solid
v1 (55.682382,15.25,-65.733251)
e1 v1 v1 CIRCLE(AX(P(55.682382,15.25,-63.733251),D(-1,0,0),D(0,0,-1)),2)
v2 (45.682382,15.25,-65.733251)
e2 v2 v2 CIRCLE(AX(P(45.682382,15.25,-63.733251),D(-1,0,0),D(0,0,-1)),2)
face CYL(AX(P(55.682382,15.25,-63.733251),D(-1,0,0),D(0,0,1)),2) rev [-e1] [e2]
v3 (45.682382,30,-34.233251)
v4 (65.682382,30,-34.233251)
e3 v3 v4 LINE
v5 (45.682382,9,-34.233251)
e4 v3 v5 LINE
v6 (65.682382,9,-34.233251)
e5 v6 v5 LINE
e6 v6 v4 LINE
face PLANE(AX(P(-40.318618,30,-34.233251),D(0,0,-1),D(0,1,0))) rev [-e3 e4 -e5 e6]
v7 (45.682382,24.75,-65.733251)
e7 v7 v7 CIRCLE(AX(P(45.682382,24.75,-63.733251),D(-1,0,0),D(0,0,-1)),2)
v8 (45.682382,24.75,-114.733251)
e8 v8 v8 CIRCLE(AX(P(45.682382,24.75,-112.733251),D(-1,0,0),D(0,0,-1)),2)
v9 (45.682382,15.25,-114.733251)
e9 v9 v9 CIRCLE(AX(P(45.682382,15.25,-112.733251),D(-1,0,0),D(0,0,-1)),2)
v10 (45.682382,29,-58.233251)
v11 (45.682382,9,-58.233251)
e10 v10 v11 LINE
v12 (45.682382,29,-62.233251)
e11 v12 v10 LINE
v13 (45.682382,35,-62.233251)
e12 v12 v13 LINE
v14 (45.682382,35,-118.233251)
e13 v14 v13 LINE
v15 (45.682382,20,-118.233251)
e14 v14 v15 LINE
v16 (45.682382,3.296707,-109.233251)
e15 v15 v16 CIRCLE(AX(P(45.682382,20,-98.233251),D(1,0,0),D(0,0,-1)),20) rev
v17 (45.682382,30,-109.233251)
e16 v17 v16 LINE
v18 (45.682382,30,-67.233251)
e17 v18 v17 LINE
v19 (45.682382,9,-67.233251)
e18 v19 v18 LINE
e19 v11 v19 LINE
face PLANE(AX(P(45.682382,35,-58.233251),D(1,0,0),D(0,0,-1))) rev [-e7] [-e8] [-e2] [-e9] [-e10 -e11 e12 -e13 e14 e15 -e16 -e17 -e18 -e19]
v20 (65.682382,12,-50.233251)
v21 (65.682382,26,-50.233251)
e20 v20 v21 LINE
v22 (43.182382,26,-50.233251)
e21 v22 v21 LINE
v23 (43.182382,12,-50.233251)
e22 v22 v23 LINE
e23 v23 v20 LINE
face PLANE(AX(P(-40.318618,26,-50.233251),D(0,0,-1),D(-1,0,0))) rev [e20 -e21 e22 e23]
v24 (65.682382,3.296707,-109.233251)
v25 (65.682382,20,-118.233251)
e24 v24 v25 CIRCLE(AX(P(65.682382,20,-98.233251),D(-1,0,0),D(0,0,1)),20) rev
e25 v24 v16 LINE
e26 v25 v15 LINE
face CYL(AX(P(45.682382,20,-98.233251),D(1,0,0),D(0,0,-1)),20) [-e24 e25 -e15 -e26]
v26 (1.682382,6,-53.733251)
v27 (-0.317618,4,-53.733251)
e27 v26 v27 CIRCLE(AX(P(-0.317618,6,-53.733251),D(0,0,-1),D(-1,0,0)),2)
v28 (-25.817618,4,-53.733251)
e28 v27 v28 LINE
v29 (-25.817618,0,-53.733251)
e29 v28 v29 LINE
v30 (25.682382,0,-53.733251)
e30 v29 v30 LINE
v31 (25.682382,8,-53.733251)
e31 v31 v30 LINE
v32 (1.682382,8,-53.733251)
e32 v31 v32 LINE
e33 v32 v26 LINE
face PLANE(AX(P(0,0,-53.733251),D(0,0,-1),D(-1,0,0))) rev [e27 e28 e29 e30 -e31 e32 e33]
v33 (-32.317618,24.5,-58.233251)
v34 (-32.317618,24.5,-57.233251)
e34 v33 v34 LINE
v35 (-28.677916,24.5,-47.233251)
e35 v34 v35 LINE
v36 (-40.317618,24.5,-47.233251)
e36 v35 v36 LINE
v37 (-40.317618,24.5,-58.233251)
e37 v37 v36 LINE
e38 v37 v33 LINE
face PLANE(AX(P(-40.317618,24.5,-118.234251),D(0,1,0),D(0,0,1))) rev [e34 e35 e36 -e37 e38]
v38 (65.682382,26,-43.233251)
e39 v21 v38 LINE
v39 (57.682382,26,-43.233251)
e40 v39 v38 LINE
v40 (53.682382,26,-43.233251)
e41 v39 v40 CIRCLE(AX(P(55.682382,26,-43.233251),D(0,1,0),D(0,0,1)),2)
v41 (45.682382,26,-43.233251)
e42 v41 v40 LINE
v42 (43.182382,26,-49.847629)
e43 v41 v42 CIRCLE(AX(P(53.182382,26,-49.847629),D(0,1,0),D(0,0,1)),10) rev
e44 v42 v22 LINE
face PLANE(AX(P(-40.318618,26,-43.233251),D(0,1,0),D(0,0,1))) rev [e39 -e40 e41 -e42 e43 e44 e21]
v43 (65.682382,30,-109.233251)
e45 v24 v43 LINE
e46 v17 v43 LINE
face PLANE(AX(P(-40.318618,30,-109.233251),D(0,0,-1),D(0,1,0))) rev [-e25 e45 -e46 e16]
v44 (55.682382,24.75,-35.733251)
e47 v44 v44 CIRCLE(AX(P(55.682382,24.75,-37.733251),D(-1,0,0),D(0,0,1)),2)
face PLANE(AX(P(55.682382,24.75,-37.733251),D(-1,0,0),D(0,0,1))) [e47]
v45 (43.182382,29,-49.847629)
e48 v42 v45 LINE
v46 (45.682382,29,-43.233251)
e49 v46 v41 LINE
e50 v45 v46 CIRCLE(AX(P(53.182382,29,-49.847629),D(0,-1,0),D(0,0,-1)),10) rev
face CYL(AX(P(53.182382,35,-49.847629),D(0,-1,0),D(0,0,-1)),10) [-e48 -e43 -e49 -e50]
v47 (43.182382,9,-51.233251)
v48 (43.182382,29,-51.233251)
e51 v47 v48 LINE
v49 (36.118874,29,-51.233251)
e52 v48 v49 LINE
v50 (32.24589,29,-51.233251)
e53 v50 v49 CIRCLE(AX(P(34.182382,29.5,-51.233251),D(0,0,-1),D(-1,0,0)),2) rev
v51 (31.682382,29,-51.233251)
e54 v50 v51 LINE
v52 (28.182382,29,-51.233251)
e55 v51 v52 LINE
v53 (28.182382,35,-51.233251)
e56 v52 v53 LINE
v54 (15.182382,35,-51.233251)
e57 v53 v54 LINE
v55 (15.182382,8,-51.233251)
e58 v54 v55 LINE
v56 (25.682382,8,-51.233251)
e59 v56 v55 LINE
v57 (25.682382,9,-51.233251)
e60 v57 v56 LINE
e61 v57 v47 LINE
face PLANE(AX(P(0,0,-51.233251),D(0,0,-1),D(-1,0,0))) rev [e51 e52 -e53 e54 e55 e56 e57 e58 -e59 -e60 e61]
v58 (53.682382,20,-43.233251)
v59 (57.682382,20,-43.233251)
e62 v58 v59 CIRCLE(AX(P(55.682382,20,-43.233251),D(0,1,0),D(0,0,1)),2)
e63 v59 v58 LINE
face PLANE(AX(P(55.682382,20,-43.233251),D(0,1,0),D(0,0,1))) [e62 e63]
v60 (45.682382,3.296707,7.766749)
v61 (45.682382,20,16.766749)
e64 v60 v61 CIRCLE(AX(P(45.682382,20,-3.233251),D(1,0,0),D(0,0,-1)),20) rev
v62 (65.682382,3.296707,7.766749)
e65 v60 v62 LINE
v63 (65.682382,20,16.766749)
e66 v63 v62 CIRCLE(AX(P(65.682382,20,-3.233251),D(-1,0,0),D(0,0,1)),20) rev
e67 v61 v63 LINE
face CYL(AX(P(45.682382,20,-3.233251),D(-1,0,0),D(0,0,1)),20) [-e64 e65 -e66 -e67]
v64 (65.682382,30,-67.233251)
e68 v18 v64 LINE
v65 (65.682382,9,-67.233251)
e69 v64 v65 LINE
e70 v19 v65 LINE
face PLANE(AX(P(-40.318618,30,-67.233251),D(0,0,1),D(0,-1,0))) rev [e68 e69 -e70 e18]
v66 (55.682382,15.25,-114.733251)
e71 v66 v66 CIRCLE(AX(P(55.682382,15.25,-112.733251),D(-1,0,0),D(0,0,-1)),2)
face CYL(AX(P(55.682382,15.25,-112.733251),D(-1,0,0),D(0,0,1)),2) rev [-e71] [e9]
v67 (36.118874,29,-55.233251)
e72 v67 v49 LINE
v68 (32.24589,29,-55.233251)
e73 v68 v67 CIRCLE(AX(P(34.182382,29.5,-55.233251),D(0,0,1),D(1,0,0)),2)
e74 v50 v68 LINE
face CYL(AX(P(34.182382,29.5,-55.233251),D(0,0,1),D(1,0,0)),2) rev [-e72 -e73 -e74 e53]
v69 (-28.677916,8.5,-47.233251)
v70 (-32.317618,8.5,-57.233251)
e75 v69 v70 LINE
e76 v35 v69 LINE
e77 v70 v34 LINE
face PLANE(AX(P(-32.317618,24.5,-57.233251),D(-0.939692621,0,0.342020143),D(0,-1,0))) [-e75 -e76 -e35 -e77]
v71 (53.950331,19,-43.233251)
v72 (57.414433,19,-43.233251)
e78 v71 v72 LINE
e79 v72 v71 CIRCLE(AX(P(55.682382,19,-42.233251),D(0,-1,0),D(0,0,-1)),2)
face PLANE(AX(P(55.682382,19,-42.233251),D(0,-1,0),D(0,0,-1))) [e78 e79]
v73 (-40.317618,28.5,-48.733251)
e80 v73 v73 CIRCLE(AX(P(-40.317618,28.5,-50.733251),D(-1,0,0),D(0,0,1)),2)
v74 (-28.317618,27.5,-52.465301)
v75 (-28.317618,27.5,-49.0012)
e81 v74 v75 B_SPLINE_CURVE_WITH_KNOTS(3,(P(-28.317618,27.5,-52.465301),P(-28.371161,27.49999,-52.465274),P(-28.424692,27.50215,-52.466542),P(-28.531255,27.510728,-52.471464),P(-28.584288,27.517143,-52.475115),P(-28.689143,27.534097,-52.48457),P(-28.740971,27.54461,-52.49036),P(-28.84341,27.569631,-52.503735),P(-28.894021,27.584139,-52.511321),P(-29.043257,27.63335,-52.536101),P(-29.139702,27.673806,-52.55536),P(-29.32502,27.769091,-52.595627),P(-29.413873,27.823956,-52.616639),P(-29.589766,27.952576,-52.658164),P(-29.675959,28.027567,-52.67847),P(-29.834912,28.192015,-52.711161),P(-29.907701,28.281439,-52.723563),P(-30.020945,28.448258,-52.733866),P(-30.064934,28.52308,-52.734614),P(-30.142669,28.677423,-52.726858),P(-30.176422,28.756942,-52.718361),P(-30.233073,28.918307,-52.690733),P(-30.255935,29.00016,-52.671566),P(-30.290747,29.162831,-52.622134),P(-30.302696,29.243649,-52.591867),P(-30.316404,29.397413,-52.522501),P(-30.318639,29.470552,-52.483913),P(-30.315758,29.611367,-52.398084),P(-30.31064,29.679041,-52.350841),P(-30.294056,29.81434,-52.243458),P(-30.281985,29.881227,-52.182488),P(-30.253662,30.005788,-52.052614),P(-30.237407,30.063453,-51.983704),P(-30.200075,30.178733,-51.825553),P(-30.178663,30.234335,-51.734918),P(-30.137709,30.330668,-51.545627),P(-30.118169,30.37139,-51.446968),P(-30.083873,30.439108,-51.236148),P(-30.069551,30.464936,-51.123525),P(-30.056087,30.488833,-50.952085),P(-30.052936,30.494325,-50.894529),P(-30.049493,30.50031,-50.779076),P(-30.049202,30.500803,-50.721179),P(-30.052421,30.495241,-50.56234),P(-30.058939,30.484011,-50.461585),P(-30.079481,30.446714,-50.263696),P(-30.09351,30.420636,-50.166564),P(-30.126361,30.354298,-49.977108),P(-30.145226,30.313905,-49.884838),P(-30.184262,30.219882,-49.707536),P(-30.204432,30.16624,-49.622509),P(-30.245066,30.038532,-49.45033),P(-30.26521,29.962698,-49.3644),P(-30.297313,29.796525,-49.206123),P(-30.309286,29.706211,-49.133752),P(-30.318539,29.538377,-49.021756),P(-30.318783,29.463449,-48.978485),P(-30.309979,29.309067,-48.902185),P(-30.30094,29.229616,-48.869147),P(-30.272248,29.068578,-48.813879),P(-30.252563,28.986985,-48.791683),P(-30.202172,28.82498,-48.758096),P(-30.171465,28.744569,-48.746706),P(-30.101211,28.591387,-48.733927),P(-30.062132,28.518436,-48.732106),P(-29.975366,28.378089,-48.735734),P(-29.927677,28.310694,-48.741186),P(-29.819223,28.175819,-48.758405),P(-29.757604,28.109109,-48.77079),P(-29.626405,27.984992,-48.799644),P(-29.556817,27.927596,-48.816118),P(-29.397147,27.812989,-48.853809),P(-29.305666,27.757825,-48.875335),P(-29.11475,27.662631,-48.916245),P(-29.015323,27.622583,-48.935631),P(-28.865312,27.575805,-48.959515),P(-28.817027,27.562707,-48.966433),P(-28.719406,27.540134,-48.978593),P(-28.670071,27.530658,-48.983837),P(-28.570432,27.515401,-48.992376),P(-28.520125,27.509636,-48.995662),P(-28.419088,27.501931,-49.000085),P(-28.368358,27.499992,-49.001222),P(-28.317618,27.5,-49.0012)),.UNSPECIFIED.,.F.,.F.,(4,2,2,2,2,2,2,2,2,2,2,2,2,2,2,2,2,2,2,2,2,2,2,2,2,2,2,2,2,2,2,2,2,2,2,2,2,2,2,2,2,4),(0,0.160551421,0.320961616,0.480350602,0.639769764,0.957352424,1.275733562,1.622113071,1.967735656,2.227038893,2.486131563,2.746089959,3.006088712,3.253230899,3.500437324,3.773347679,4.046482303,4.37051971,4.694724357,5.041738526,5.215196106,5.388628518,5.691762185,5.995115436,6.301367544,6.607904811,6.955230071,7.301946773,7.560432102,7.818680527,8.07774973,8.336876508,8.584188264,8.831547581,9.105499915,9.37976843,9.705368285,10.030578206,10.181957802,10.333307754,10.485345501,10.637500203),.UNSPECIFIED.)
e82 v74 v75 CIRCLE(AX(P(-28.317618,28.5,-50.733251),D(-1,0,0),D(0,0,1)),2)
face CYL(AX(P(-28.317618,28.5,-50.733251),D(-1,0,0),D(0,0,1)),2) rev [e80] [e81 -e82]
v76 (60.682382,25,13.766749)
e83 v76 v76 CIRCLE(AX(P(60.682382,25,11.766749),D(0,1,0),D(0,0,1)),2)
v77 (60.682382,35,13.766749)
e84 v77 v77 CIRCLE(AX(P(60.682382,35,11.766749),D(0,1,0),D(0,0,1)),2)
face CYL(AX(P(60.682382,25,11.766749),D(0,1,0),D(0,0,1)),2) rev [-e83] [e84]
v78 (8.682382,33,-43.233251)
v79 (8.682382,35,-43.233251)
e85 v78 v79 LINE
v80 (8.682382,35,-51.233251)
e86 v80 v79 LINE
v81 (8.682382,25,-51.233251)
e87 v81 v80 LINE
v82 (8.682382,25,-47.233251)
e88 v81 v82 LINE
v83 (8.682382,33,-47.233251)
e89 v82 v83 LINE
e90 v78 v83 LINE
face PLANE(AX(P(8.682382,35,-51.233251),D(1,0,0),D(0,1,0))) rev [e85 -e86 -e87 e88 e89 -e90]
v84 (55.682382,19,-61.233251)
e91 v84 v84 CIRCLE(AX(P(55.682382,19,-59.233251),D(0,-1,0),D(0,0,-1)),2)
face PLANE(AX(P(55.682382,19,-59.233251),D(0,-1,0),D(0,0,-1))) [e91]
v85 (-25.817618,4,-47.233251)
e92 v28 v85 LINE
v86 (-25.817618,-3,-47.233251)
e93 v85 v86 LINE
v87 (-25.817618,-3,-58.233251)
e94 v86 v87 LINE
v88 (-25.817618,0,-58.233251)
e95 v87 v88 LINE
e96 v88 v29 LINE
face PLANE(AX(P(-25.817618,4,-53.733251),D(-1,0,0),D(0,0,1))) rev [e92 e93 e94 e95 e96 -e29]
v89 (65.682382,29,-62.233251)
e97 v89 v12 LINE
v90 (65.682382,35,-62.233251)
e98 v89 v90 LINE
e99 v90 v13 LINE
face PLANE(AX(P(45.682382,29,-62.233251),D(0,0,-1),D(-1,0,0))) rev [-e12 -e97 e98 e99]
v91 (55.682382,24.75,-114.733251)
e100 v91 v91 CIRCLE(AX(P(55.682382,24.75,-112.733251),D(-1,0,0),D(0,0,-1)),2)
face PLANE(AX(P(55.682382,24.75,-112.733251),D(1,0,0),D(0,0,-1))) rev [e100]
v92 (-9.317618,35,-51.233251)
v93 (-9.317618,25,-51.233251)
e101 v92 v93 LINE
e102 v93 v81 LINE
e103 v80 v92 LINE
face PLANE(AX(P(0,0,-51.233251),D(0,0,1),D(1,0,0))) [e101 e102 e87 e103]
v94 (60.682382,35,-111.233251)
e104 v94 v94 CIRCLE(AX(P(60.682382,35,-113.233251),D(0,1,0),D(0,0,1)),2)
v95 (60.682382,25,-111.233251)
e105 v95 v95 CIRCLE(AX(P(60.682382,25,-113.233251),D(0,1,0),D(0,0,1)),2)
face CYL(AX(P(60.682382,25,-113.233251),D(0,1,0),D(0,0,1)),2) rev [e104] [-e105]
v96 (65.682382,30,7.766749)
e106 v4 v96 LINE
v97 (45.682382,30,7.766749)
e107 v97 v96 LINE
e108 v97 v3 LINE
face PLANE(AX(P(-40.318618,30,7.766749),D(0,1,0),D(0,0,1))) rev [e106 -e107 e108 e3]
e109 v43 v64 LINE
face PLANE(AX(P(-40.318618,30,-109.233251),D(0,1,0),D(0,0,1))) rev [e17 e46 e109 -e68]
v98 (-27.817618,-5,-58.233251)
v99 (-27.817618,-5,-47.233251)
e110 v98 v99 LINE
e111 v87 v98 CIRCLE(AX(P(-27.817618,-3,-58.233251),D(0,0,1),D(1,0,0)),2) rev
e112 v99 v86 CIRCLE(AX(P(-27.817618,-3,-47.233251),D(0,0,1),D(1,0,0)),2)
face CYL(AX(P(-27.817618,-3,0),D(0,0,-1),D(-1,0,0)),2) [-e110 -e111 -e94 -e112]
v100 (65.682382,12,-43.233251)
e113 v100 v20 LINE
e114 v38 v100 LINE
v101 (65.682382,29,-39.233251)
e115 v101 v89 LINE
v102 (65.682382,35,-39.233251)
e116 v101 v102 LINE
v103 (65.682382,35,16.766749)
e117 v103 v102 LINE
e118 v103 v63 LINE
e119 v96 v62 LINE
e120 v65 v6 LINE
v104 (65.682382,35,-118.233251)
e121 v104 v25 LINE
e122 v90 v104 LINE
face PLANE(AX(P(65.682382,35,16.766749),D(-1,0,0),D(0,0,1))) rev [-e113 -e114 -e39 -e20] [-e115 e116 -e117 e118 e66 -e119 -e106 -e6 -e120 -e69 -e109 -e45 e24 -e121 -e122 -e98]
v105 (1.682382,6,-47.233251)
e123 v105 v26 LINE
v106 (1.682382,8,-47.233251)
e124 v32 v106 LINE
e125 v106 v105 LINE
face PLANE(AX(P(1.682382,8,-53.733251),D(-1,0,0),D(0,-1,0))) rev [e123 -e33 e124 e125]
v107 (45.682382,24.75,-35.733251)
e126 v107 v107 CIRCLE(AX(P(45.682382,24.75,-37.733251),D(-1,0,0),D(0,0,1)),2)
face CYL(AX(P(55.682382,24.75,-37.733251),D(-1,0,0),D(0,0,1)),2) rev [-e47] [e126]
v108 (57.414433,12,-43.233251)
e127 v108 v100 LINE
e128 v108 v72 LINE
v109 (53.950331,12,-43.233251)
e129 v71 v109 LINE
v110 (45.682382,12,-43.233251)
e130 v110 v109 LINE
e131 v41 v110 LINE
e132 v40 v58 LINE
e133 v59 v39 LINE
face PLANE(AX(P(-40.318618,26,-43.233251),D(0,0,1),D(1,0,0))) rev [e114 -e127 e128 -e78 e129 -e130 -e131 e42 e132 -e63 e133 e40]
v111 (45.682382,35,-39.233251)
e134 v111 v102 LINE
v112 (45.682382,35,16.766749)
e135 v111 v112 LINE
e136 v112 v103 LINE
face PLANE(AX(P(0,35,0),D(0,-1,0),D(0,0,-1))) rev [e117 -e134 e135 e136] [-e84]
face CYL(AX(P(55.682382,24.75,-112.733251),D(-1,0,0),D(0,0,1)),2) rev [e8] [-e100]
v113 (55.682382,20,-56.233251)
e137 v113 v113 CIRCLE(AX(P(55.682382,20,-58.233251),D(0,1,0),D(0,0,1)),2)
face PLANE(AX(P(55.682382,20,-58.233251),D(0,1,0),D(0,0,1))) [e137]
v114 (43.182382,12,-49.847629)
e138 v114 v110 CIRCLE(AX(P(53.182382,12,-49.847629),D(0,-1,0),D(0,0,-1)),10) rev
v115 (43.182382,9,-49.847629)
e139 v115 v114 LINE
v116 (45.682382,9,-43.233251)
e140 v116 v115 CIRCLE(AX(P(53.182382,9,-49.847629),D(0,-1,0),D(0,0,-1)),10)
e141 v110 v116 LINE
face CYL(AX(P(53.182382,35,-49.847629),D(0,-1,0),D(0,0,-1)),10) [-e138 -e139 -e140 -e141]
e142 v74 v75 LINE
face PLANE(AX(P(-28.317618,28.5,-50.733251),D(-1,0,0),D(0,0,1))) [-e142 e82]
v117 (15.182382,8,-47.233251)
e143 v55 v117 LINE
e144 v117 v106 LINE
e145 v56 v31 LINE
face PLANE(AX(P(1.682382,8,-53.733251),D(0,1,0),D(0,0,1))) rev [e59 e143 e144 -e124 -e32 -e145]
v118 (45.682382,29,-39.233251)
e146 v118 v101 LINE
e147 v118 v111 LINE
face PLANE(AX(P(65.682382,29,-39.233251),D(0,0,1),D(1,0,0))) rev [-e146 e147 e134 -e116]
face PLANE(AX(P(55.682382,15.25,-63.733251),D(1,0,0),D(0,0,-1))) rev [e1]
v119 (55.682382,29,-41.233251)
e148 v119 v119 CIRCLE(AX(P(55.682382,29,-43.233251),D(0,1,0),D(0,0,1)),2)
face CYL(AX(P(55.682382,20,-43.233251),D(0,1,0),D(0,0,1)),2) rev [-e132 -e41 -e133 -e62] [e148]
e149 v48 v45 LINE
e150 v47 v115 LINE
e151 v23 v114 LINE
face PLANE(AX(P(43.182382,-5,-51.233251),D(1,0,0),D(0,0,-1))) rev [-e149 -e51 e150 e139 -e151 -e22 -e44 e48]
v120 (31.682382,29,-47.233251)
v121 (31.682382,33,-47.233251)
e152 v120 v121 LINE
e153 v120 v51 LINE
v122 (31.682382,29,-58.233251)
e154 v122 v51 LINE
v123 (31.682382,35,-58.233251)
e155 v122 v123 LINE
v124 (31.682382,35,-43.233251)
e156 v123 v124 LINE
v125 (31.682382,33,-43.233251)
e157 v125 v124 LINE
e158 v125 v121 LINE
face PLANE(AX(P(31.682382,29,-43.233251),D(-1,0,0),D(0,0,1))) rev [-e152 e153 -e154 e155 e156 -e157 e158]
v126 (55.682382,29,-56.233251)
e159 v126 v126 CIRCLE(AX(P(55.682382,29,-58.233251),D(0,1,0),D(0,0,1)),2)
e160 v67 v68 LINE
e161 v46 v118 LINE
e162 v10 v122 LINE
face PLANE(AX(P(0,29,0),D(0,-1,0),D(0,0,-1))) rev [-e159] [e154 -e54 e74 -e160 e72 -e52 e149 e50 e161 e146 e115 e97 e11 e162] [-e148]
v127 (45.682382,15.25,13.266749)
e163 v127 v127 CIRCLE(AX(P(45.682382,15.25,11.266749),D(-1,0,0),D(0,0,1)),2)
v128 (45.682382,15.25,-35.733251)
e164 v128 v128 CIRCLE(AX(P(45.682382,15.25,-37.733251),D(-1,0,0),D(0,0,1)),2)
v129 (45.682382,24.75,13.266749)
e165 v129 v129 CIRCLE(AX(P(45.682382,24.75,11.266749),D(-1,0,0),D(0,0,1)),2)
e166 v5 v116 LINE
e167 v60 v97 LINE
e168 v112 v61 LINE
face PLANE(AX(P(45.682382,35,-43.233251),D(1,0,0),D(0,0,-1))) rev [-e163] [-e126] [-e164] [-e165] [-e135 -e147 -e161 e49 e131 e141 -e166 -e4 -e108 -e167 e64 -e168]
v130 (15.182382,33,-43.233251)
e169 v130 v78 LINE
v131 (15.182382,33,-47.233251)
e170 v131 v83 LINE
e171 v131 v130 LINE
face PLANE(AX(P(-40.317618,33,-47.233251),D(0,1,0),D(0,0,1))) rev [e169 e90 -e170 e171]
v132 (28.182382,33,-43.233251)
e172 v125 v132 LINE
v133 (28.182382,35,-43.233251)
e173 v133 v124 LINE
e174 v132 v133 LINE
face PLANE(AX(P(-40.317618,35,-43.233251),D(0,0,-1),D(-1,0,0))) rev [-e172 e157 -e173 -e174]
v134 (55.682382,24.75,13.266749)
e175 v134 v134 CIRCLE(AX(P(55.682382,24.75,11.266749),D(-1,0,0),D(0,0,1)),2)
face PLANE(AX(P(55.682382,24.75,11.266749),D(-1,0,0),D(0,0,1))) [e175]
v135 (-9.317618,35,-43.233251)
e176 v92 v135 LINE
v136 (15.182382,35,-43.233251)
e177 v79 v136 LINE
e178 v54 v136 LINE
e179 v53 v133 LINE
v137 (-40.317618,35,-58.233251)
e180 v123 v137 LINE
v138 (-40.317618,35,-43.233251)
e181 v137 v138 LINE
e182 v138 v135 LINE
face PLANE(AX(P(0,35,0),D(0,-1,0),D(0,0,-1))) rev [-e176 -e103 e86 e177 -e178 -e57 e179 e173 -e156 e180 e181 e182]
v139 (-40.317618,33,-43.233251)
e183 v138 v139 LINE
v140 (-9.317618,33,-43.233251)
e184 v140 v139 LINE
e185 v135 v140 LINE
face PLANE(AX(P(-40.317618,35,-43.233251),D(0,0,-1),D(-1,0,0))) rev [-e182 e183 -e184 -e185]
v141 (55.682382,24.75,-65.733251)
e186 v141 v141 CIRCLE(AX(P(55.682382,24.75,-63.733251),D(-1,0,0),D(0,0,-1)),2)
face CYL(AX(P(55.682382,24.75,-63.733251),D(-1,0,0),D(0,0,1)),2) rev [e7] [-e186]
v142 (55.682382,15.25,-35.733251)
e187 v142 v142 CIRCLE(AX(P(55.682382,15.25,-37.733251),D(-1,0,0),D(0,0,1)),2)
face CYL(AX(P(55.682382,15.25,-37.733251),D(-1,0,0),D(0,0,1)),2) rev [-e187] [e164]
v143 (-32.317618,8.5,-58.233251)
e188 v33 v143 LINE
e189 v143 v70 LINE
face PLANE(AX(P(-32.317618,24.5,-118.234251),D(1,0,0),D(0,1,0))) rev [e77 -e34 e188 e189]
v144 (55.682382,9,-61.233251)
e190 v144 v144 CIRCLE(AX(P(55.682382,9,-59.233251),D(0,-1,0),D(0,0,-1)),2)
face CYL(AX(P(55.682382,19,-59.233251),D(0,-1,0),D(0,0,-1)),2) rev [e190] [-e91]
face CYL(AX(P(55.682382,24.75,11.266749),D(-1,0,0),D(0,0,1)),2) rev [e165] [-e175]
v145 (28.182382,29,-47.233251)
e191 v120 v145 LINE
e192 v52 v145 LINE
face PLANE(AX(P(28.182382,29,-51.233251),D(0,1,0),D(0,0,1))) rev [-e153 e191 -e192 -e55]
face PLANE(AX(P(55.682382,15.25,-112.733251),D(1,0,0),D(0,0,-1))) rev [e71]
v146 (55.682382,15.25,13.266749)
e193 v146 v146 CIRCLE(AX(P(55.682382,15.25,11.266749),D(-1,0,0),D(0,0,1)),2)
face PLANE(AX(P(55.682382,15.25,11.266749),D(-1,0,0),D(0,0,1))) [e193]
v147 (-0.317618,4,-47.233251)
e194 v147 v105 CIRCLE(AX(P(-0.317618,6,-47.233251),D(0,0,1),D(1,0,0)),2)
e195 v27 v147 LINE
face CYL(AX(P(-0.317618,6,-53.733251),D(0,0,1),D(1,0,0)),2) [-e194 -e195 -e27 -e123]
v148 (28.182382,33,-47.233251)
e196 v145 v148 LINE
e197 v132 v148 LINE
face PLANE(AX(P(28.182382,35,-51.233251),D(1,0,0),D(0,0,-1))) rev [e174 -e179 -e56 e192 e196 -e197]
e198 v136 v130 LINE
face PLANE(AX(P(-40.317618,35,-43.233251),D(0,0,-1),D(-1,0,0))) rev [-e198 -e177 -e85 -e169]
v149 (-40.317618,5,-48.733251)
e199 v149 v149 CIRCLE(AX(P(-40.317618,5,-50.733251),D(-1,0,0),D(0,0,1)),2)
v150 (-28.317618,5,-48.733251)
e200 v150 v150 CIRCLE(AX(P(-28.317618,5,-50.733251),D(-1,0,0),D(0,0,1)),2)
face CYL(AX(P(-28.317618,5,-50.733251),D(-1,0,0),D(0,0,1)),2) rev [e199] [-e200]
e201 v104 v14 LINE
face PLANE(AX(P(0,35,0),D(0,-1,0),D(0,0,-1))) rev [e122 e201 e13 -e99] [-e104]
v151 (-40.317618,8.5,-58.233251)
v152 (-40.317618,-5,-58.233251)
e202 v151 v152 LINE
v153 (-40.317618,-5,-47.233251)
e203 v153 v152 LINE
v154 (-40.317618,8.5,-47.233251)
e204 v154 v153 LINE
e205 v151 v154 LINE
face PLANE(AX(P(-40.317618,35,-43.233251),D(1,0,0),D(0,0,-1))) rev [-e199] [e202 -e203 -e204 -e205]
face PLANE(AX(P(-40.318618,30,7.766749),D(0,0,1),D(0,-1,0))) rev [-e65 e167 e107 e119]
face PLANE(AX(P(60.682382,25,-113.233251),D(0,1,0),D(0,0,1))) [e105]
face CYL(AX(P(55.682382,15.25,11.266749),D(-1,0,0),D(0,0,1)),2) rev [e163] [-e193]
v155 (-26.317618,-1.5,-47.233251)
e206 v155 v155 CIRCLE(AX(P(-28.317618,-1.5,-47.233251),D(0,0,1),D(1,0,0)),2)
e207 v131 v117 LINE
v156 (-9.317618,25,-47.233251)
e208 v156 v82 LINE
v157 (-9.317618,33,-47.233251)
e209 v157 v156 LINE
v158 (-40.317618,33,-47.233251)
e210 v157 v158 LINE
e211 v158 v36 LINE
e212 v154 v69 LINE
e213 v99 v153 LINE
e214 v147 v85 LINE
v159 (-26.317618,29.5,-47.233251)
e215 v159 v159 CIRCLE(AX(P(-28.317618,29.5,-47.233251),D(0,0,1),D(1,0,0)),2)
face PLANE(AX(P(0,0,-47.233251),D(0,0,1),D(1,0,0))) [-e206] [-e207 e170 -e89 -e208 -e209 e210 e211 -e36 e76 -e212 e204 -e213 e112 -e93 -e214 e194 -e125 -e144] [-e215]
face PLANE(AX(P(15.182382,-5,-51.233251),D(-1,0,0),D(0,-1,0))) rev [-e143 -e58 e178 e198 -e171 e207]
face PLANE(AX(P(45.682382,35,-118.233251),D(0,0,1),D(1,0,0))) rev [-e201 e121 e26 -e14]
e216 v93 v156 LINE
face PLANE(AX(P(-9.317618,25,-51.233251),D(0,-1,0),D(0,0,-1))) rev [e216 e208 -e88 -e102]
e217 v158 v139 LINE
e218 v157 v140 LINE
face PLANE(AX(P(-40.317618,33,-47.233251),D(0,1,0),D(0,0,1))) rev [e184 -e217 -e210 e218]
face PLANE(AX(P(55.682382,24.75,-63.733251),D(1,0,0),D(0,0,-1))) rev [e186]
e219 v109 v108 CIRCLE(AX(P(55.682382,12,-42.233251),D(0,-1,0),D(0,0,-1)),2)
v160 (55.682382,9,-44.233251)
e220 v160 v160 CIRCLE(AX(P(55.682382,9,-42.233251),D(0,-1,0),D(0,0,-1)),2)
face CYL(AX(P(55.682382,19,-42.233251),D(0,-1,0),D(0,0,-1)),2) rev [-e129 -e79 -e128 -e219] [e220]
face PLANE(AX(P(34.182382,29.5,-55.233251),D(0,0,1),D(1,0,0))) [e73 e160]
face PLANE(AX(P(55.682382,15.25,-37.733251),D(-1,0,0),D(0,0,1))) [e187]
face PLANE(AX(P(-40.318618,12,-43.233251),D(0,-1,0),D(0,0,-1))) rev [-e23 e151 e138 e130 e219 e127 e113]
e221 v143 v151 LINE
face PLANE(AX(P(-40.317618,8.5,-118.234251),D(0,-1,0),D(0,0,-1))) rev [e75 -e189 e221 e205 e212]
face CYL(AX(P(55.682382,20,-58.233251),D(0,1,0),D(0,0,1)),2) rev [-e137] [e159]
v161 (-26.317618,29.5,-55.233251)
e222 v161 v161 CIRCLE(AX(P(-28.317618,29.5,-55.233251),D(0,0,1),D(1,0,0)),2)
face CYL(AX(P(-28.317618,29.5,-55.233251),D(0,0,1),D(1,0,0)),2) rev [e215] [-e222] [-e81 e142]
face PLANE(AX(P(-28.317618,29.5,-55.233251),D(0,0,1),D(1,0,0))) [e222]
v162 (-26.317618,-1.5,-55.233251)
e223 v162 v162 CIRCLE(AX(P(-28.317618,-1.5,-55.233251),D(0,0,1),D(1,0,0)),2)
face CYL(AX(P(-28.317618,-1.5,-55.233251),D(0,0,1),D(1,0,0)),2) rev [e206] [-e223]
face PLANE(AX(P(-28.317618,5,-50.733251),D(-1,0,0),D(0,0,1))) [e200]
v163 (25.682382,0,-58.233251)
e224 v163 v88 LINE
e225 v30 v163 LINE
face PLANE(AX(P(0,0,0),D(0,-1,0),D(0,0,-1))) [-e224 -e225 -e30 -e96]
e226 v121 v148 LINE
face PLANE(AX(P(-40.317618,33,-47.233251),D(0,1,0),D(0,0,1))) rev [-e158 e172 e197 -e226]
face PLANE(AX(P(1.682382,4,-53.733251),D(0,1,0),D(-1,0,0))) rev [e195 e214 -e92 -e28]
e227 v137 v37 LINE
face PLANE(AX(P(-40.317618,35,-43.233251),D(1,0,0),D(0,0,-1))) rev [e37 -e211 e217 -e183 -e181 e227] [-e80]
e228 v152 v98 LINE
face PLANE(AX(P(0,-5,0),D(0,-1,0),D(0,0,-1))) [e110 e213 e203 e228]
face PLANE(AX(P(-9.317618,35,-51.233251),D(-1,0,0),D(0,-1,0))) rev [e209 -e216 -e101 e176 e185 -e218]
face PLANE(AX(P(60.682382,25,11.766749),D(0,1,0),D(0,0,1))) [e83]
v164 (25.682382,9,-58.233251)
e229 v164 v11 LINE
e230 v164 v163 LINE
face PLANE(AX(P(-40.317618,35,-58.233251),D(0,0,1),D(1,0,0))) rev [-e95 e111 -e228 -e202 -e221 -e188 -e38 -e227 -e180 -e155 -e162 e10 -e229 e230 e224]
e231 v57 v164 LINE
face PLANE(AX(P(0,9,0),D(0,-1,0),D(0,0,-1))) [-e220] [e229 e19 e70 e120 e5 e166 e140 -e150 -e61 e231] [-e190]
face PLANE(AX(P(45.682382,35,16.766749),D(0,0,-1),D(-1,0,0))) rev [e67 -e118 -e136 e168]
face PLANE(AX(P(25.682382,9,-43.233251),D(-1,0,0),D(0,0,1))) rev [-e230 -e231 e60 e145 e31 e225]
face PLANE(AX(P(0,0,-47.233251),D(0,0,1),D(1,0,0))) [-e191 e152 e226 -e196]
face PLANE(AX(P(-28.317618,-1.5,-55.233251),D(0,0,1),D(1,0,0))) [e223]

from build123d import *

# Parameters (mm, degrees)
BOSS_EXTRUDE1_DEPTH = 35
CUT_EXTRUDE1_REACH  = 164.604
SKETCH2_W           = 42
SKETCH2_H           = 21
SKETCH3_R           = 2
CUT_EXTRUDE2_DEPTH  = 10
FILLET1_R           = 20
CUT_EXTRUDE5_REACH  = 164.604
SKETCH6_W           = 42
SKETCH6_H           = 9
SKETCH7_R           = 2
CUT_EXTRUDE6_DEPTH  = 12
CUT_EXTRUDE7_DEPTH  = 9
SKETCH9_R           = 2
CUT_EXTRUDE8_DEPTH  = 10
CUT_EXTRUDE9_DEPTH  = 6
SKETCH11_R          = 2
CUT_EXTRUDE10_DEPTH = 9
SKETCH12_R          = 2
CUT_EXTRUDE11_DEPTH = 10
SKETCH14_W          = 83
SKETCH14_H          = 33
CUT_EXTRUDE13_DEPTH = 4
CUT_EXTRUDE14_DEPTH = 6.5
SKETCH16_W          = 14.5
SKETCH16_H          = 11
BOSS_EXTRUDE2_DEPTH = 5
SKETCH13_R          = 2
CUT_EXTRUDE12_DEPTH = 12
FILLET2_R           = 2
FILLET3_R           = 2
SKETCH17_W          = 18
SKETCH17_H          = 10
CUT_EXTRUDE15_DEPTH = 8
CUT_EXTRUDE18_REACH = 104.86
SKETCH20_W          = 8
SKETCH20_H          = 16
CHAMFER1_SIZE       = 10
CHAMFER1_SIZE2      = 3.639702343
CUT_EXTRUDE19_REACH = 164.604
SKETCH22_W          = 7
SKETCH22_H          = 14
FILLET8_R           = 10


with BuildPart() as part:
    # Sketch1 → Boss-Extrude1 (new body)
    with BuildSketch(Plane(origin=(0, 0, 0), x_dir=(1, 0, 0), z_dir=(0, 1, 0))):
        Polygon((-40.317617866, 43.23325062), (45.682382134, 43.23325062), (45.682382134, -16.76674938), (65.682382134, -16.76674938), (65.682382134, 118.23325062), (45.682382134, 118.23325062), (45.682382134, 58.23325062), (-40.317617866, 58.23325062), align=None)
    extrude(amount=BOSS_EXTRUDE1_DEPTH)

    # Sketch2 → Cut-Extrude1 (cut, up to next)
    with BuildSketch(Plane(origin=(65.682382134, 0, 0), x_dir=(0, 0, -1), z_dir=(1, 0, 0)), mode=Mode.PRIVATE) as cut_extrude1_sk1:
        with Locations((13.23325062, 19.5)):
            Rectangle(SKETCH2_W, SKETCH2_H)
    cut_extrude1_tool1 = extrude(cut_extrude1_sk1.sketch, amount=-CUT_EXTRUDE1_REACH, mode=Mode.PRIVATE) & part.part
    # Sketch2 → Cut-Extrude1 (cut, up to next)
    with BuildSketch(Plane(origin=(65.682382134, 0, 0), x_dir=(0, 0, -1), z_dir=(1, 0, 0)), mode=Mode.PRIVATE) as cut_extrude1_sk2:
        with Locations((88.23325062, 19.5)):
            Rectangle(SKETCH2_W, SKETCH2_H)
    cut_extrude1_tool2 = extrude(cut_extrude1_sk2.sketch, amount=-CUT_EXTRUDE1_REACH, mode=Mode.PRIVATE) & part.part
    add(cut_extrude1_tool1.solids().sort_by_distance((65.682382, 19.5, -13.233251))[0], mode=Mode.SUBTRACT)
    add(cut_extrude1_tool2.solids().sort_by_distance((65.682382, 19.5, -88.233251))[0], mode=Mode.SUBTRACT)

    # Sketch3 → Cut-Extrude2 (cut)
    with BuildSketch(Plane.ZY.offset(-45.682382134)):
        with Locations((11.26674938, 24.75)):
            Circle(SKETCH3_R)
        with Locations((11.26674938, 15.25)):
            Circle(SKETCH3_R)
        with Locations((-37.73325062, 24.75)):
            Circle(SKETCH3_R)
        with Locations((-37.73325062, 15.25)):
            Circle(SKETCH3_R)
        with Locations(Location((-112.73325062, 24.75, 0), (0, 0, 180))):
            Circle(SKETCH3_R)
        with Locations(Location((-112.73325062, 15.25, 0), (0, 0, 180))):
            Circle(SKETCH3_R)
        with Locations(Location((-63.73325062, 15.25, 0), (0, 0, 180))):
            Circle(SKETCH3_R)
        with Locations(Location((-63.73325062, 24.75, 0), (0, 0, 180))):
            Circle(SKETCH3_R)
    extrude(amount=-CUT_EXTRUDE2_DEPTH, mode=Mode.SUBTRACT)

    # Fillet1
    fillet1_edges = [part.edges().sort_by_distance(p)[0] for p in [
        (55.682382134, 0, -118.23325062),
        (55.682382134, 0, 16.76674938),
    ]]
    fillet(fillet1_edges, radius=FILLET1_R)

    # Sketch6 → Cut-Extrude5 (cut, up to next)
    with BuildSketch(Plane(origin=(65.682382134, 0, 0), x_dir=(0, 0, -1), z_dir=(1, 0, 0)), mode=Mode.PRIVATE) as cut_extrude5_sk1:
        with Locations((13.23325062, 4.5)):
            Rectangle(SKETCH6_W, SKETCH6_H)
    cut_extrude5_tool1 = extrude(cut_extrude5_sk1.sketch, amount=-CUT_EXTRUDE5_REACH, mode=Mode.PRIVATE) & part.part
    # Sketch6 → Cut-Extrude5 (cut, up to next)
    with BuildSketch(Plane(origin=(65.682382134, 0, 0), x_dir=(0, 0, -1), z_dir=(1, 0, 0)), mode=Mode.PRIVATE) as cut_extrude5_sk2:
        with Locations((88.23325062, 4.5)):
            Rectangle(SKETCH6_W, SKETCH6_H)
    cut_extrude5_tool2 = extrude(cut_extrude5_sk2.sketch, amount=-CUT_EXTRUDE5_REACH, mode=Mode.PRIVATE) & part.part
    add(cut_extrude5_tool1.solids().sort_by_distance((65.682382, 4.5, -13.233251))[0], mode=Mode.SUBTRACT)
    add(cut_extrude5_tool2.solids().sort_by_distance((65.682382, 4.5, -88.233251))[0], mode=Mode.SUBTRACT)

    # Sketch7 → Cut-Extrude6 (cut)
    with BuildSketch(Plane.ZY.offset(40.317617866)):
        with Locations((-50.73325062, 28.5)):
            Circle(SKETCH7_R)
        with Locations((-50.73325062, 5)):
            Circle(SKETCH7_R)
    extrude(amount=-CUT_EXTRUDE6_DEPTH, mode=Mode.SUBTRACT)

    # Sketch8 → Cut-Extrude7 (cut)
    with BuildSketch(Plane.XZ):
        Polygon((45.682382134, -67.23325062), (45.682382134, -58.23325062), (25.682382134, -58.23325062), (25.682382134, -43.23325062), (45.682382134, -43.23325062), (45.682382134, -34.23325062), (65.682382134, -34.23325062), (65.682382134, -67.23325062), align=None)
    extrude(amount=-CUT_EXTRUDE7_DEPTH, mode=Mode.SUBTRACT)

    # Sketch9 → Cut-Extrude8 (cut)
    with BuildSketch(Plane.XZ.offset(-9)):
        with Locations(Location((55.682382134, -42.23325062, 0), (0, 0, 270))):
            Circle(SKETCH9_R)
        with Locations(Location((55.682382134, -59.23325062, 0), (0, 0, 270))):
            Circle(SKETCH9_R)
    extrude(amount=-CUT_EXTRUDE8_DEPTH, mode=Mode.SUBTRACT)

    # Sketch10 → Cut-Extrude9 (cut)
    with BuildSketch(Plane(origin=(0, 35, 0), x_dir=(1, 0, 0), z_dir=(0, 1, 0))):
        Polygon((45.682382134, 62.23325062), (65.682382134, 62.23325062), (65.682382134, 39.23325062), (45.682382134, 39.23325062), (45.682382134, 43.23325062), (31.682382134, 43.23325062), (31.682382134, 58.23325062), (45.682382134, 58.23325062), align=None)
    extrude(amount=-CUT_EXTRUDE9_DEPTH, mode=Mode.SUBTRACT)

    # Sketch11 → Cut-Extrude10 (cut)
    with BuildSketch(Plane(origin=(0, 29, 0), x_dir=(1, 0, 0), z_dir=(0, 1, 0))):
        with Locations(Location((55.682382134, 58.23325062, 0), (0, 0, 270))):
            Circle(SKETCH11_R)
        with Locations(Location((55.682382134, 43.23325062, 0), (0, 0, 270))):
            Circle(SKETCH11_R)
    extrude(amount=-CUT_EXTRUDE10_DEPTH, mode=Mode.SUBTRACT)

    # Sketch12 → Cut-Extrude11 (cut)
    with BuildSketch(Plane(origin=(0, 35, 0), x_dir=(1, 0, 0), z_dir=(0, 1, 0))):
        with Locations(Location((60.682382134, -11.76674938, 0), (0, 0, 270))):
            Circle(SKETCH12_R)
        with Locations(Location((60.682382134, 113.23325062, 0), (0, 0, 270))):
            Circle(SKETCH12_R)
    extrude(amount=-CUT_EXTRUDE11_DEPTH, mode=Mode.SUBTRACT)

    # Sketch14 → Cut-Extrude13 (cut)
    with BuildSketch(Plane.XY.offset(-43.23325062)):
        with Locations((1.182382134, 16.5)):
            Rectangle(SKETCH14_W, SKETCH14_H)
    extrude(amount=-CUT_EXTRUDE13_DEPTH, mode=Mode.SUBTRACT)

    # Sketch15 → Cut-Extrude14 (cut)
    with BuildSketch(Plane.XY.offset(-47.23325062)):
        Polygon((1.682382134, 8), (33.682382134, 8), (33.682382134, 0), (-25.817617866, 0), (-25.817617866, 4), (1.682382134, 4), align=None)
    extrude(amount=-CUT_EXTRUDE14_DEPTH, mode=Mode.SUBTRACT)

    # Sketch16 → Boss-Extrude2 (add)
    with BuildSketch(Plane.XZ):
        with Locations((-33.067617866, -52.73325062)):
            Rectangle(SKETCH16_W, SKETCH16_H)
    extrude(amount=BOSS_EXTRUDE2_DEPTH)

    # Sketch13 → Cut-Extrude12 (cut)
    with BuildSketch(Plane.XY.offset(-43.23325062)):
        with Locations((-28.317617866, 29.5)):
            Circle(SKETCH13_R)
        with Locations((34.182382134, 29.5)):
            Circle(SKETCH13_R)
        with Locations((34.182382134, -1.5)):
            Circle(SKETCH13_R)
        with Locations((-28.317617866, -1.5)):
            Circle(SKETCH13_R)
    extrude(amount=-CUT_EXTRUDE12_DEPTH, mode=Mode.SUBTRACT)

    # Fillet2
    fillet2_edges = [part.edges().sort_by_distance(p)[0] for p in [
        (-25.817617866, -5, -52.73325062),
    ]]
    fillet(fillet2_edges, radius=FILLET2_R)

    # Fillet3
    fillet3_edges = [part.edges().sort_by_distance(p)[0] for p in [
        (1.682382134, 4, -50.48325062),
    ]]
    fillet(fillet3_edges, radius=FILLET3_R)

    # Sketch17 → Cut-Extrude15 (cut)
    with BuildSketch(Plane.XY.offset(-43.23325062)):
        Polygon((43.182382134, -5), (15.182382134, -5), (15.182382134, 35), (28.182382134, 35), (28.182382134, 29), (43.182382134, 29), align=None)
        with Locations((-0.317617866, 30)):
            Rectangle(SKETCH17_W, SKETCH17_H)
    extrude(amount=-CUT_EXTRUDE15_DEPTH, mode=Mode.SUBTRACT)

    # Sketch20 → Cut-Extrude18 (cut, up to next)
    with BuildSketch(Plane.XY.offset(-47.23325062), mode=Mode.PRIVATE) as cut_extrude18_sk1:
        with Locations((-36.317617866, 16.5)):
            Rectangle(SKETCH20_W, SKETCH20_H)
    cut_extrude18_tool1 = extrude(cut_extrude18_sk1.sketch, amount=-CUT_EXTRUDE18_REACH, mode=Mode.PRIVATE) & part.part
    add(cut_extrude18_tool1.solids().sort_by_distance((-36.317618, 16.5, -47.233251))[0], mode=Mode.SUBTRACT)

    # Chamfer1
    chamfer1_edges = [part.edges().sort_by_distance(p)[0] for p in [
        (-32.317617866, 16.5, -47.23325062),
    ]]
    chamfer1_side = [part.faces().sort_by_distance(p)[0] for p in [
        (-32.317617866, 16.5, -52.73325062),
    ]]
    chamfer(chamfer1_edges, length=CHAMFER1_SIZE, length2=CHAMFER1_SIZE2, reference=chamfer1_side[0])

    # Sketch22 → Cut-Extrude19 (cut, up to next)
    with BuildSketch(Plane(origin=(65.682382134, 0, 0), x_dir=(0, 0, -1), z_dir=(1, 0, 0)), mode=Mode.PRIVATE) as cut_extrude19_sk1:
        with Locations((46.73325062, 19)):
            Rectangle(SKETCH22_W, SKETCH22_H)
    cut_extrude19_tool1 = extrude(cut_extrude19_sk1.sketch, amount=-CUT_EXTRUDE19_REACH, mode=Mode.PRIVATE) & part.part
    add(cut_extrude19_tool1.solids().sort_by_distance((65.682382, 19, -46.733251))[0], mode=Mode.SUBTRACT)

    # Fillet8
    # the kernel refuses this fillet: 10 mm, written as the material it takes off along each edge
    with BuildSketch(Plane(origin=(43.182382134, 28.535945694, -43.23325062), x_dir=(0, 0, -1), z_dir=(0, -1, 0)), Plane(origin=(43.182382134, 45.535945694, -43.23325062), x_dir=(0, 0, -1), z_dir=(0, -1, 0))) as fillet8_piece_1:
        with BuildLine():
            CenterArc((6.614378278, 10), FILLET8_R, 228.590377891, 41.409622109)
            Line((0, 2.5), (0, 0))
            Line((0, 0), (6.614378278, 0))
        make_face()
    extrude(amount=36.071891388, mode=Mode.SUBTRACT)


solid = part.part
